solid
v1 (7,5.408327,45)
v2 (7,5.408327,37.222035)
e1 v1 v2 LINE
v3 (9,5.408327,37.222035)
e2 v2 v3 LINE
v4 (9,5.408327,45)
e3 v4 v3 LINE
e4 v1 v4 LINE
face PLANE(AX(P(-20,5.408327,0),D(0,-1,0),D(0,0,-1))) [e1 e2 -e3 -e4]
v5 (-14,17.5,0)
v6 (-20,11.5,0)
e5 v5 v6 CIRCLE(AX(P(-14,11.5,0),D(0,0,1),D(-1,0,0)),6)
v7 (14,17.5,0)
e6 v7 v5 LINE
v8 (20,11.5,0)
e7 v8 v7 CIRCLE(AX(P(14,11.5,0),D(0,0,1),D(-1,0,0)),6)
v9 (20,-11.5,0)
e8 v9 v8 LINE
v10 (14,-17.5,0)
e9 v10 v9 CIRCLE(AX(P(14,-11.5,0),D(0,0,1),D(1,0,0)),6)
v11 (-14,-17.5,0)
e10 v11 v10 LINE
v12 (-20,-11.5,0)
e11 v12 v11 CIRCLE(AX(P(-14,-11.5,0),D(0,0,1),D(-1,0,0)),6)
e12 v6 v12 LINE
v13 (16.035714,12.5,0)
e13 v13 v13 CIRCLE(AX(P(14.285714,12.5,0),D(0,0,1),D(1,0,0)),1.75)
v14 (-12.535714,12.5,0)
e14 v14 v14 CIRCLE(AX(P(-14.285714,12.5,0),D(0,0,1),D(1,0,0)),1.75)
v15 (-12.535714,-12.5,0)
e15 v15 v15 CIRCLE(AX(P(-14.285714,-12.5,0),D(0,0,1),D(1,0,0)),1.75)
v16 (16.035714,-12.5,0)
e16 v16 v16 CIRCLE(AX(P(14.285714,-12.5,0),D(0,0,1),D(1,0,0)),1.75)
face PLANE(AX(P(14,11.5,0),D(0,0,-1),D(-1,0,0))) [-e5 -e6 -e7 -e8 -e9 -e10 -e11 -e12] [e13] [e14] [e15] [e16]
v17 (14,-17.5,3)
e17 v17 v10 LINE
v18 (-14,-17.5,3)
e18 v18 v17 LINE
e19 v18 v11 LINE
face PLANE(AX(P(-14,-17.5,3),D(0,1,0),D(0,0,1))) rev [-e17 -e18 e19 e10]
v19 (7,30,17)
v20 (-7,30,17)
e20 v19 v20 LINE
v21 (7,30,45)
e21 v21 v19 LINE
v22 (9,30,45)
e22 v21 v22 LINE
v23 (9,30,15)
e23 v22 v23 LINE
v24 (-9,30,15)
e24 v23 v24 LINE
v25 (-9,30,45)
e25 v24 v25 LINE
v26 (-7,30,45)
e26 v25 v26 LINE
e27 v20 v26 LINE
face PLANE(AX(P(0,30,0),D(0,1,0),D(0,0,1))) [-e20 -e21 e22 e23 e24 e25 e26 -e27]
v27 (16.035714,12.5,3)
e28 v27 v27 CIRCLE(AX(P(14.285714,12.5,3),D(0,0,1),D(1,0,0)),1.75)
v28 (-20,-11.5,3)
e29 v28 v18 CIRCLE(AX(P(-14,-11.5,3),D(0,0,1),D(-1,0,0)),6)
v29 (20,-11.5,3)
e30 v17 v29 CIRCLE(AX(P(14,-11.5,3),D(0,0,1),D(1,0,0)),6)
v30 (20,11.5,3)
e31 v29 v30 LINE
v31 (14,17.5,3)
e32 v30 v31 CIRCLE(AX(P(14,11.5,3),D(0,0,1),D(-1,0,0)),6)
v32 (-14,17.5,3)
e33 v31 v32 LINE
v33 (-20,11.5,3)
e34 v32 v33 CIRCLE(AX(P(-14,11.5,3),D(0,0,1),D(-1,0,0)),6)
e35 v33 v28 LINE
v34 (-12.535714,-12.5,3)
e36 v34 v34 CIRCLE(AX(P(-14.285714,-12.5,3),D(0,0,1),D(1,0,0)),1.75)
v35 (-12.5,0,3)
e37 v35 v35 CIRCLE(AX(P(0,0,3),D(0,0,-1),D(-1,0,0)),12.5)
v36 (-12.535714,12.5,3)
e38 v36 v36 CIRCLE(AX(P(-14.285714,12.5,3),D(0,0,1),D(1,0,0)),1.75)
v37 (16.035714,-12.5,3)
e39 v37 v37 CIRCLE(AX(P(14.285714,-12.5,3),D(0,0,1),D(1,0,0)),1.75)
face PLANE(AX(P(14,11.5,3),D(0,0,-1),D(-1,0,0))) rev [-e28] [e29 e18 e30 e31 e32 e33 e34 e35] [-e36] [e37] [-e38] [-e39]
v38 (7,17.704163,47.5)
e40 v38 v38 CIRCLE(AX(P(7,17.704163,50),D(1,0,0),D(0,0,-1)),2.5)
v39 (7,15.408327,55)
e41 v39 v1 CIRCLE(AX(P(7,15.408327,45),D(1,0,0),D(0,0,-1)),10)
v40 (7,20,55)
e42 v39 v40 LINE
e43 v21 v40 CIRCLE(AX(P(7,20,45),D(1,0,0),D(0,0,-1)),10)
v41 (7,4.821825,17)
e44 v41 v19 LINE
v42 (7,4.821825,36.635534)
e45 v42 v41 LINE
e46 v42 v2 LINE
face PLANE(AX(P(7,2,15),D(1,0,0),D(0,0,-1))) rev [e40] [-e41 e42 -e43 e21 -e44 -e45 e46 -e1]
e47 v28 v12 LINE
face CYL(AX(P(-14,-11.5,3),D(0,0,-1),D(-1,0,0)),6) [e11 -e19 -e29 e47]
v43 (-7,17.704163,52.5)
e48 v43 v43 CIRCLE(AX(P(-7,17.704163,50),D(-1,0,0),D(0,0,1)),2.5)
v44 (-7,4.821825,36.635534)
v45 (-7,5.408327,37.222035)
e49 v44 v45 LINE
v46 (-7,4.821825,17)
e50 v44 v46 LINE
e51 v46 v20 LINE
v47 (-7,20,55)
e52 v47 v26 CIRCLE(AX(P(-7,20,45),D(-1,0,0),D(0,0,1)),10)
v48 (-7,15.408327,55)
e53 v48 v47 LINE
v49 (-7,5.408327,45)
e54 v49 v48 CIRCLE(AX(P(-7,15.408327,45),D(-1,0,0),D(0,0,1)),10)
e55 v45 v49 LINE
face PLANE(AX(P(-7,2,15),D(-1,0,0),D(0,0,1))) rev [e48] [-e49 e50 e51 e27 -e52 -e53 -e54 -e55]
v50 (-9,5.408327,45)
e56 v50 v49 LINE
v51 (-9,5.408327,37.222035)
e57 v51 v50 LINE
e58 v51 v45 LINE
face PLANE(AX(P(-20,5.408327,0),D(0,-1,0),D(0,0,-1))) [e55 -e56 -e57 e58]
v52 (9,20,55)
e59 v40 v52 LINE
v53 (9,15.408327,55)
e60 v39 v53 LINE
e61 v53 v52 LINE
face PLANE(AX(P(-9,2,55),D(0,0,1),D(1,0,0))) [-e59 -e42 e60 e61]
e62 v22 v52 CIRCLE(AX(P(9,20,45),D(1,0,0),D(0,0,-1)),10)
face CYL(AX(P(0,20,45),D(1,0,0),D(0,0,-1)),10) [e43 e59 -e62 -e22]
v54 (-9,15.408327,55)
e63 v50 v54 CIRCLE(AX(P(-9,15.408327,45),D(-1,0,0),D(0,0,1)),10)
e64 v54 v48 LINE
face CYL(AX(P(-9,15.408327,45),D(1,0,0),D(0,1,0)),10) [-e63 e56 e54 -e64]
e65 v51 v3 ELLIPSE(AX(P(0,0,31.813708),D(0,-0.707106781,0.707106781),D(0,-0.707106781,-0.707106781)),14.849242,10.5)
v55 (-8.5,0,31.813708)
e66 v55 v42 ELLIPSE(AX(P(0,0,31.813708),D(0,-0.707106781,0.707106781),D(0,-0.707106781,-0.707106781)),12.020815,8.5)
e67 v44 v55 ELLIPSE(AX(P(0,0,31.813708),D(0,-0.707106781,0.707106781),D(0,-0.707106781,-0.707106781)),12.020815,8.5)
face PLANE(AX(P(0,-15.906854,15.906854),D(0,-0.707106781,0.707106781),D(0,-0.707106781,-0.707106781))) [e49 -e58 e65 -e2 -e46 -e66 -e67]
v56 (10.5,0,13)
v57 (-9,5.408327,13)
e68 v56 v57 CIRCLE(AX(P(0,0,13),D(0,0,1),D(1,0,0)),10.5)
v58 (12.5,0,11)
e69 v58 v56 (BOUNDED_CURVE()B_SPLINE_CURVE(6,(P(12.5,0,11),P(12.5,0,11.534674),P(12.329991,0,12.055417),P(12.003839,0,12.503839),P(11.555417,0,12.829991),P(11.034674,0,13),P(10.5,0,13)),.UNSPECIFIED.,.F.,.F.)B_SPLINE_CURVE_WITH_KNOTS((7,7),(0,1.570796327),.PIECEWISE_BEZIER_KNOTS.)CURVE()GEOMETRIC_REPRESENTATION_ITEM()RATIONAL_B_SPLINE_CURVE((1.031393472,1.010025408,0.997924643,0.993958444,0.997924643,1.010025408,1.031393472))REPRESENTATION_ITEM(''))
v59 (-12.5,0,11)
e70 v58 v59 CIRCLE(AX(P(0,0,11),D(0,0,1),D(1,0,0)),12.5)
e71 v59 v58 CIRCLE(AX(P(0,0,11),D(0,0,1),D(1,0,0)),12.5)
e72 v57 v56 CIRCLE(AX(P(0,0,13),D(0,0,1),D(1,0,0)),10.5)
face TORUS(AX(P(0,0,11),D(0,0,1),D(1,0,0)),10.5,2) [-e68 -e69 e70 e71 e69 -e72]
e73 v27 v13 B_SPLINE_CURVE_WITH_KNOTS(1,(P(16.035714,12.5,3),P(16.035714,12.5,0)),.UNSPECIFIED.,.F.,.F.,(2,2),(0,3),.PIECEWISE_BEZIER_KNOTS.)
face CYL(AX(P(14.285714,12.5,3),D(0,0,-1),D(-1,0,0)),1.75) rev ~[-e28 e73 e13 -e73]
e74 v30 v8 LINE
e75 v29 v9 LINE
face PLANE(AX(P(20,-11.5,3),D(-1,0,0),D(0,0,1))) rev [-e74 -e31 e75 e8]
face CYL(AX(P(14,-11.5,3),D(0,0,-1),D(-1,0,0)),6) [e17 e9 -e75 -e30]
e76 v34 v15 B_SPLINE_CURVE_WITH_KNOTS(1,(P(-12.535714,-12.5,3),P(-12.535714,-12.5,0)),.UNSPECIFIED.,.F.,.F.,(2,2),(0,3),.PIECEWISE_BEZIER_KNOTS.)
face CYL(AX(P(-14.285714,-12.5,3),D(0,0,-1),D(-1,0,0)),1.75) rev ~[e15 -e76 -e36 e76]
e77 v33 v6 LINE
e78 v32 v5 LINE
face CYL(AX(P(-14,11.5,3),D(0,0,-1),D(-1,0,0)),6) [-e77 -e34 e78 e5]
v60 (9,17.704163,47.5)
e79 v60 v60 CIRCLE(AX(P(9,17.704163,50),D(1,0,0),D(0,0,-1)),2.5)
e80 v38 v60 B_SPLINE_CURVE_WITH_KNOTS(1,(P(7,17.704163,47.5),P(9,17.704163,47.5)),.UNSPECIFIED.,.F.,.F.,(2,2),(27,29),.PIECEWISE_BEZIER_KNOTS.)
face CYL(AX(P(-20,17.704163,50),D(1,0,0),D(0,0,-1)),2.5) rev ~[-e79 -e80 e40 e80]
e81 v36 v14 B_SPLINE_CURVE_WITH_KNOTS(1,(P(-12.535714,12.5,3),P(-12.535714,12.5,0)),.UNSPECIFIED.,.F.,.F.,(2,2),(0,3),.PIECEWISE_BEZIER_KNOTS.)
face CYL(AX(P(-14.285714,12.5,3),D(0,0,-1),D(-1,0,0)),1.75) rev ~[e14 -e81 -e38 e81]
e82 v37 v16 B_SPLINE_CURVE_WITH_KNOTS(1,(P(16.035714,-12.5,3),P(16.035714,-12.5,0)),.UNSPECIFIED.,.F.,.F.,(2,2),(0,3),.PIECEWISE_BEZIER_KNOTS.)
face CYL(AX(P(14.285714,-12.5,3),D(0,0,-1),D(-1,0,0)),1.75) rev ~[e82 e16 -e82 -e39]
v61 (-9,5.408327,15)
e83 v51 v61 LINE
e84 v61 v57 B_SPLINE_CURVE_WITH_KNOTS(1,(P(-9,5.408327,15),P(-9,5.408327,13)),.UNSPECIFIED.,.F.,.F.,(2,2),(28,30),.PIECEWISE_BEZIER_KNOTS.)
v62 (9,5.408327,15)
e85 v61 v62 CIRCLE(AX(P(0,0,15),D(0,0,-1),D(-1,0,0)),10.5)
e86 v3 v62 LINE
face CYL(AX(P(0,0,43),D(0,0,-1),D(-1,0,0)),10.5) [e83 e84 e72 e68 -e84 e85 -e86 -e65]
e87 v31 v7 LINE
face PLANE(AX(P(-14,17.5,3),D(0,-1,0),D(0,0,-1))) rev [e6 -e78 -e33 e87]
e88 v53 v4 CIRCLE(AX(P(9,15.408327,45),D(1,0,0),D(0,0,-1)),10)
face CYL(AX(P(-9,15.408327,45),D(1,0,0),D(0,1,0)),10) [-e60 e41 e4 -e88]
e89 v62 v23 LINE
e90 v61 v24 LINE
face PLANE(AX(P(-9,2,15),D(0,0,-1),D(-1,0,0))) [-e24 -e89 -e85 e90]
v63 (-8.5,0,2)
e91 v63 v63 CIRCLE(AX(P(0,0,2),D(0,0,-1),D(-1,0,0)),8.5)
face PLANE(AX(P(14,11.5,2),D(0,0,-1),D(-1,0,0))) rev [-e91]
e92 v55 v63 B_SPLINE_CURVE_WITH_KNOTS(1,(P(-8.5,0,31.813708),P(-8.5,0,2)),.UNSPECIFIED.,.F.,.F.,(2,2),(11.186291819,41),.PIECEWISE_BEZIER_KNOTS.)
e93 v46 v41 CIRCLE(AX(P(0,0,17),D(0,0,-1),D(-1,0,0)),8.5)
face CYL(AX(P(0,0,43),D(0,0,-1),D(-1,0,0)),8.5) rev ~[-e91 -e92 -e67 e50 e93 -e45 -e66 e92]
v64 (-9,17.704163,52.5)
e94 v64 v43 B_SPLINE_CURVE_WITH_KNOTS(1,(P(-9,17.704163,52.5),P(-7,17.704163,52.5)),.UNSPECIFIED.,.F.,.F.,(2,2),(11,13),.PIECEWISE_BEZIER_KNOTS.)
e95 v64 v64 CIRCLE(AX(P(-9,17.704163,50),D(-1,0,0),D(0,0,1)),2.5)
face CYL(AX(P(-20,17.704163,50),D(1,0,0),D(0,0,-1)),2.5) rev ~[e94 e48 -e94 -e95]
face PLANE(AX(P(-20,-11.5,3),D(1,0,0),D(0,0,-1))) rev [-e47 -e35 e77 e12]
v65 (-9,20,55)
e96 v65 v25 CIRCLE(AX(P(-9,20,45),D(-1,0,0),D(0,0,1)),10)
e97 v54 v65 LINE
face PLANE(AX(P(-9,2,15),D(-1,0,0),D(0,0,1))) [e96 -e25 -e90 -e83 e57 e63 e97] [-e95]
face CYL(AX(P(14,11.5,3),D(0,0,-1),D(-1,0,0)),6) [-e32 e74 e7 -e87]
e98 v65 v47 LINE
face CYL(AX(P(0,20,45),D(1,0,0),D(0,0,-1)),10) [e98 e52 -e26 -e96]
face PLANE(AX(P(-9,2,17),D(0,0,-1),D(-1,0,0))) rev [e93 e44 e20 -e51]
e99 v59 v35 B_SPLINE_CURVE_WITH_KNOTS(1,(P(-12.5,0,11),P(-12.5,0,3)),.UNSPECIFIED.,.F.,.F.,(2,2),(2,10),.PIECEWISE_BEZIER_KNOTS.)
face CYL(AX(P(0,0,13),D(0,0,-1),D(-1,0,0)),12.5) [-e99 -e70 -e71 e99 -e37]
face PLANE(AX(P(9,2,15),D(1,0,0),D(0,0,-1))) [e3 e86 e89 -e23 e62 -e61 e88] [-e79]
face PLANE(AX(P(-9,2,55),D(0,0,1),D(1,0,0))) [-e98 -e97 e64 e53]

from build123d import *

# Parameters (mm, degrees)
SKETCH_1_R               = 1.75
EXTRUDE_1_DEPTH          = 3
SKETCH_2_R               = 12.5
EXTRUDE_2_DEPTH          = 10
FILLET_1_R               = 2
SKETCH_5_R               = 10.5
EXTRUDE_4_DEPTH          = 30
SKETCH_7_W               = 18
SKETCH_7_H               = 40
EXTRUDE_5_DEPTH          = 28
CUT_EXTRUDE_1_DEPTH      = 70.036222376
CUT_EXTRUDE_1_DEPTH_BACK = 70.036222376
SHELL_START              = 17
SHELL_1_DEPTH            = 38
SHELL_START_2            = 2
SHELL_1_2_OUTLINE_R      = 8.5
SHELL_1_2_DEPTH          = 15
FILLET_2_R               = 10
SKETCH_9_R               = 2.5
CUT_EXTRUDE_2_DEPTH      = 70.036222376


# Read off the part's stored shape, not the designer's step: 抽壳1
with BuildPart() as part:
    # 草图1 → 凸台-拉伸1 (new body)
    with BuildSketch(Plane.XY):
        with BuildLine():
            Line((-14, -17.5), (14, -17.5))
            ThreePointArc((14, -17.5), (18.242640687, -15.742640687), (20, -11.5))
            Line((20, -11.5), (20, 11.5))
            ThreePointArc((20, 11.5), (18.242640687, 15.742640687), (14, 17.5))
            Line((14, 17.5), (-14, 17.5))
            ThreePointArc((-14, 17.5), (-18.242640687, 15.742640687), (-20, 11.5))
            Line((-20, 11.5), (-20, -11.5))
            ThreePointArc((-20, -11.5), (-18.242640687, -15.742640687), (-14, -17.5))
        make_face()
        with Locations((-14.285714286, 12.5)):
            Circle(SKETCH_1_R, mode=Mode.SUBTRACT)
        with Locations((-14.285714286, -12.5)):
            Circle(SKETCH_1_R, mode=Mode.SUBTRACT)
        with Locations((14.285714286, -12.5)):
            Circle(SKETCH_1_R, mode=Mode.SUBTRACT)
        with Locations((14.285714286, 12.5)):
            Circle(SKETCH_1_R, mode=Mode.SUBTRACT)
    extrude(amount=EXTRUDE_1_DEPTH)

    # 草图2 → 凸台-拉伸2 (add)
    with BuildSketch(Plane.XY.offset(3)):
        with Locations(Location((0, 0, 0), (0, 0, 180))):
            Circle(SKETCH_2_R)
    extrude(amount=EXTRUDE_2_DEPTH)

    # 圆角1
    fillet_1_edges = [part.edges().sort_by_distance(p)[0] for p in [
        (12.5, 0, 13),
    ]]
    fillet(fillet_1_edges, radius=FILLET_1_R)

    # 草图5 → 凸台-拉伸4 (add)
    with BuildSketch(Plane.XY.offset(13)):
        Circle(SKETCH_5_R)
    extrude(amount=EXTRUDE_4_DEPTH)

    # Surface Cut 2
    split(bisect_by=Plane(origin=(0, -15.906854249, 15.906854249), x_dir=(1, 0, 0), z_dir=(0, -0.7071067811865488, 0.7071067811865464)), keep=Keep.BOTTOM)

    # 草图7 → 凸台-拉伸5 (add)
    with BuildSketch(Plane(origin=(0, 30, 0), x_dir=(1, 0, 0), z_dir=(0, 1, 0))):
        with Locations((0, -35)):
            Rectangle(SKETCH_7_W, SKETCH_7_H)
    extrude(amount=-EXTRUDE_5_DEPTH)

    # 草图8 → 切除-拉伸1 (cut, two sides: drawn at the far end of the back side and taken through both)
    with BuildSketch(Plane(origin=(9, 0, 0), x_dir=(0, 0, -1), z_dir=(1, 0, 0)).offset(-CUT_EXTRUDE_1_DEPTH_BACK)):
        Polygon((-37.222035412, 5.408326913), (-55, 5.408326913), (-55, 2), (-33.813708499, 2), align=None)
    extrude(amount=CUT_EXTRUDE_1_DEPTH + CUT_EXTRUDE_1_DEPTH_BACK, mode=Mode.SUBTRACT)

    # 抽壳1 outline → 抽壳1 (cut)
    with BuildSketch(Plane.XY.offset(SHELL_START)):
        with BuildLine():
            Line((7, 30), (-7, 30))
            Line((-7, 30), (-7, 4.82182538))
            ThreePointArc((-7, 4.82182538), (0, -8.5), (7, 4.82182538))
            Line((7, 4.82182538), (7, 30))
        make_face()
    extrude(amount=SHELL_1_DEPTH, mode=Mode.SUBTRACT)

    # Shell 1 2 outline → Shell 1 2 (cut)
    with BuildSketch(Plane.XY.offset(SHELL_START_2)):
        Circle(SHELL_1_2_OUTLINE_R)
    extrude(amount=SHELL_1_2_DEPTH, mode=Mode.SUBTRACT)

    # 圆角2
    fillet_2_edges = [part.edges().sort_by_distance(p)[0] for p in [
        (8, 5.408326913, 55),
        (8, 30, 55),
        (-8, 30, 55),
        (-8, 5.408326913, 55),
    ]]
    fillet(fillet_2_edges, radius=FILLET_2_R)

    # 草图9 → 切除-拉伸2 (cut, through all)
    with BuildSketch(Plane(origin=(9, 0, 0), x_dir=(0, 0, -1), z_dir=(1, 0, 0))):
        with Locations((-50, 17.704163457)):
            Circle(SKETCH_9_R)
    extrude(amount=-CUT_EXTRUDE_2_DEPTH, mode=Mode.SUBTRACT)


solid = part.part
